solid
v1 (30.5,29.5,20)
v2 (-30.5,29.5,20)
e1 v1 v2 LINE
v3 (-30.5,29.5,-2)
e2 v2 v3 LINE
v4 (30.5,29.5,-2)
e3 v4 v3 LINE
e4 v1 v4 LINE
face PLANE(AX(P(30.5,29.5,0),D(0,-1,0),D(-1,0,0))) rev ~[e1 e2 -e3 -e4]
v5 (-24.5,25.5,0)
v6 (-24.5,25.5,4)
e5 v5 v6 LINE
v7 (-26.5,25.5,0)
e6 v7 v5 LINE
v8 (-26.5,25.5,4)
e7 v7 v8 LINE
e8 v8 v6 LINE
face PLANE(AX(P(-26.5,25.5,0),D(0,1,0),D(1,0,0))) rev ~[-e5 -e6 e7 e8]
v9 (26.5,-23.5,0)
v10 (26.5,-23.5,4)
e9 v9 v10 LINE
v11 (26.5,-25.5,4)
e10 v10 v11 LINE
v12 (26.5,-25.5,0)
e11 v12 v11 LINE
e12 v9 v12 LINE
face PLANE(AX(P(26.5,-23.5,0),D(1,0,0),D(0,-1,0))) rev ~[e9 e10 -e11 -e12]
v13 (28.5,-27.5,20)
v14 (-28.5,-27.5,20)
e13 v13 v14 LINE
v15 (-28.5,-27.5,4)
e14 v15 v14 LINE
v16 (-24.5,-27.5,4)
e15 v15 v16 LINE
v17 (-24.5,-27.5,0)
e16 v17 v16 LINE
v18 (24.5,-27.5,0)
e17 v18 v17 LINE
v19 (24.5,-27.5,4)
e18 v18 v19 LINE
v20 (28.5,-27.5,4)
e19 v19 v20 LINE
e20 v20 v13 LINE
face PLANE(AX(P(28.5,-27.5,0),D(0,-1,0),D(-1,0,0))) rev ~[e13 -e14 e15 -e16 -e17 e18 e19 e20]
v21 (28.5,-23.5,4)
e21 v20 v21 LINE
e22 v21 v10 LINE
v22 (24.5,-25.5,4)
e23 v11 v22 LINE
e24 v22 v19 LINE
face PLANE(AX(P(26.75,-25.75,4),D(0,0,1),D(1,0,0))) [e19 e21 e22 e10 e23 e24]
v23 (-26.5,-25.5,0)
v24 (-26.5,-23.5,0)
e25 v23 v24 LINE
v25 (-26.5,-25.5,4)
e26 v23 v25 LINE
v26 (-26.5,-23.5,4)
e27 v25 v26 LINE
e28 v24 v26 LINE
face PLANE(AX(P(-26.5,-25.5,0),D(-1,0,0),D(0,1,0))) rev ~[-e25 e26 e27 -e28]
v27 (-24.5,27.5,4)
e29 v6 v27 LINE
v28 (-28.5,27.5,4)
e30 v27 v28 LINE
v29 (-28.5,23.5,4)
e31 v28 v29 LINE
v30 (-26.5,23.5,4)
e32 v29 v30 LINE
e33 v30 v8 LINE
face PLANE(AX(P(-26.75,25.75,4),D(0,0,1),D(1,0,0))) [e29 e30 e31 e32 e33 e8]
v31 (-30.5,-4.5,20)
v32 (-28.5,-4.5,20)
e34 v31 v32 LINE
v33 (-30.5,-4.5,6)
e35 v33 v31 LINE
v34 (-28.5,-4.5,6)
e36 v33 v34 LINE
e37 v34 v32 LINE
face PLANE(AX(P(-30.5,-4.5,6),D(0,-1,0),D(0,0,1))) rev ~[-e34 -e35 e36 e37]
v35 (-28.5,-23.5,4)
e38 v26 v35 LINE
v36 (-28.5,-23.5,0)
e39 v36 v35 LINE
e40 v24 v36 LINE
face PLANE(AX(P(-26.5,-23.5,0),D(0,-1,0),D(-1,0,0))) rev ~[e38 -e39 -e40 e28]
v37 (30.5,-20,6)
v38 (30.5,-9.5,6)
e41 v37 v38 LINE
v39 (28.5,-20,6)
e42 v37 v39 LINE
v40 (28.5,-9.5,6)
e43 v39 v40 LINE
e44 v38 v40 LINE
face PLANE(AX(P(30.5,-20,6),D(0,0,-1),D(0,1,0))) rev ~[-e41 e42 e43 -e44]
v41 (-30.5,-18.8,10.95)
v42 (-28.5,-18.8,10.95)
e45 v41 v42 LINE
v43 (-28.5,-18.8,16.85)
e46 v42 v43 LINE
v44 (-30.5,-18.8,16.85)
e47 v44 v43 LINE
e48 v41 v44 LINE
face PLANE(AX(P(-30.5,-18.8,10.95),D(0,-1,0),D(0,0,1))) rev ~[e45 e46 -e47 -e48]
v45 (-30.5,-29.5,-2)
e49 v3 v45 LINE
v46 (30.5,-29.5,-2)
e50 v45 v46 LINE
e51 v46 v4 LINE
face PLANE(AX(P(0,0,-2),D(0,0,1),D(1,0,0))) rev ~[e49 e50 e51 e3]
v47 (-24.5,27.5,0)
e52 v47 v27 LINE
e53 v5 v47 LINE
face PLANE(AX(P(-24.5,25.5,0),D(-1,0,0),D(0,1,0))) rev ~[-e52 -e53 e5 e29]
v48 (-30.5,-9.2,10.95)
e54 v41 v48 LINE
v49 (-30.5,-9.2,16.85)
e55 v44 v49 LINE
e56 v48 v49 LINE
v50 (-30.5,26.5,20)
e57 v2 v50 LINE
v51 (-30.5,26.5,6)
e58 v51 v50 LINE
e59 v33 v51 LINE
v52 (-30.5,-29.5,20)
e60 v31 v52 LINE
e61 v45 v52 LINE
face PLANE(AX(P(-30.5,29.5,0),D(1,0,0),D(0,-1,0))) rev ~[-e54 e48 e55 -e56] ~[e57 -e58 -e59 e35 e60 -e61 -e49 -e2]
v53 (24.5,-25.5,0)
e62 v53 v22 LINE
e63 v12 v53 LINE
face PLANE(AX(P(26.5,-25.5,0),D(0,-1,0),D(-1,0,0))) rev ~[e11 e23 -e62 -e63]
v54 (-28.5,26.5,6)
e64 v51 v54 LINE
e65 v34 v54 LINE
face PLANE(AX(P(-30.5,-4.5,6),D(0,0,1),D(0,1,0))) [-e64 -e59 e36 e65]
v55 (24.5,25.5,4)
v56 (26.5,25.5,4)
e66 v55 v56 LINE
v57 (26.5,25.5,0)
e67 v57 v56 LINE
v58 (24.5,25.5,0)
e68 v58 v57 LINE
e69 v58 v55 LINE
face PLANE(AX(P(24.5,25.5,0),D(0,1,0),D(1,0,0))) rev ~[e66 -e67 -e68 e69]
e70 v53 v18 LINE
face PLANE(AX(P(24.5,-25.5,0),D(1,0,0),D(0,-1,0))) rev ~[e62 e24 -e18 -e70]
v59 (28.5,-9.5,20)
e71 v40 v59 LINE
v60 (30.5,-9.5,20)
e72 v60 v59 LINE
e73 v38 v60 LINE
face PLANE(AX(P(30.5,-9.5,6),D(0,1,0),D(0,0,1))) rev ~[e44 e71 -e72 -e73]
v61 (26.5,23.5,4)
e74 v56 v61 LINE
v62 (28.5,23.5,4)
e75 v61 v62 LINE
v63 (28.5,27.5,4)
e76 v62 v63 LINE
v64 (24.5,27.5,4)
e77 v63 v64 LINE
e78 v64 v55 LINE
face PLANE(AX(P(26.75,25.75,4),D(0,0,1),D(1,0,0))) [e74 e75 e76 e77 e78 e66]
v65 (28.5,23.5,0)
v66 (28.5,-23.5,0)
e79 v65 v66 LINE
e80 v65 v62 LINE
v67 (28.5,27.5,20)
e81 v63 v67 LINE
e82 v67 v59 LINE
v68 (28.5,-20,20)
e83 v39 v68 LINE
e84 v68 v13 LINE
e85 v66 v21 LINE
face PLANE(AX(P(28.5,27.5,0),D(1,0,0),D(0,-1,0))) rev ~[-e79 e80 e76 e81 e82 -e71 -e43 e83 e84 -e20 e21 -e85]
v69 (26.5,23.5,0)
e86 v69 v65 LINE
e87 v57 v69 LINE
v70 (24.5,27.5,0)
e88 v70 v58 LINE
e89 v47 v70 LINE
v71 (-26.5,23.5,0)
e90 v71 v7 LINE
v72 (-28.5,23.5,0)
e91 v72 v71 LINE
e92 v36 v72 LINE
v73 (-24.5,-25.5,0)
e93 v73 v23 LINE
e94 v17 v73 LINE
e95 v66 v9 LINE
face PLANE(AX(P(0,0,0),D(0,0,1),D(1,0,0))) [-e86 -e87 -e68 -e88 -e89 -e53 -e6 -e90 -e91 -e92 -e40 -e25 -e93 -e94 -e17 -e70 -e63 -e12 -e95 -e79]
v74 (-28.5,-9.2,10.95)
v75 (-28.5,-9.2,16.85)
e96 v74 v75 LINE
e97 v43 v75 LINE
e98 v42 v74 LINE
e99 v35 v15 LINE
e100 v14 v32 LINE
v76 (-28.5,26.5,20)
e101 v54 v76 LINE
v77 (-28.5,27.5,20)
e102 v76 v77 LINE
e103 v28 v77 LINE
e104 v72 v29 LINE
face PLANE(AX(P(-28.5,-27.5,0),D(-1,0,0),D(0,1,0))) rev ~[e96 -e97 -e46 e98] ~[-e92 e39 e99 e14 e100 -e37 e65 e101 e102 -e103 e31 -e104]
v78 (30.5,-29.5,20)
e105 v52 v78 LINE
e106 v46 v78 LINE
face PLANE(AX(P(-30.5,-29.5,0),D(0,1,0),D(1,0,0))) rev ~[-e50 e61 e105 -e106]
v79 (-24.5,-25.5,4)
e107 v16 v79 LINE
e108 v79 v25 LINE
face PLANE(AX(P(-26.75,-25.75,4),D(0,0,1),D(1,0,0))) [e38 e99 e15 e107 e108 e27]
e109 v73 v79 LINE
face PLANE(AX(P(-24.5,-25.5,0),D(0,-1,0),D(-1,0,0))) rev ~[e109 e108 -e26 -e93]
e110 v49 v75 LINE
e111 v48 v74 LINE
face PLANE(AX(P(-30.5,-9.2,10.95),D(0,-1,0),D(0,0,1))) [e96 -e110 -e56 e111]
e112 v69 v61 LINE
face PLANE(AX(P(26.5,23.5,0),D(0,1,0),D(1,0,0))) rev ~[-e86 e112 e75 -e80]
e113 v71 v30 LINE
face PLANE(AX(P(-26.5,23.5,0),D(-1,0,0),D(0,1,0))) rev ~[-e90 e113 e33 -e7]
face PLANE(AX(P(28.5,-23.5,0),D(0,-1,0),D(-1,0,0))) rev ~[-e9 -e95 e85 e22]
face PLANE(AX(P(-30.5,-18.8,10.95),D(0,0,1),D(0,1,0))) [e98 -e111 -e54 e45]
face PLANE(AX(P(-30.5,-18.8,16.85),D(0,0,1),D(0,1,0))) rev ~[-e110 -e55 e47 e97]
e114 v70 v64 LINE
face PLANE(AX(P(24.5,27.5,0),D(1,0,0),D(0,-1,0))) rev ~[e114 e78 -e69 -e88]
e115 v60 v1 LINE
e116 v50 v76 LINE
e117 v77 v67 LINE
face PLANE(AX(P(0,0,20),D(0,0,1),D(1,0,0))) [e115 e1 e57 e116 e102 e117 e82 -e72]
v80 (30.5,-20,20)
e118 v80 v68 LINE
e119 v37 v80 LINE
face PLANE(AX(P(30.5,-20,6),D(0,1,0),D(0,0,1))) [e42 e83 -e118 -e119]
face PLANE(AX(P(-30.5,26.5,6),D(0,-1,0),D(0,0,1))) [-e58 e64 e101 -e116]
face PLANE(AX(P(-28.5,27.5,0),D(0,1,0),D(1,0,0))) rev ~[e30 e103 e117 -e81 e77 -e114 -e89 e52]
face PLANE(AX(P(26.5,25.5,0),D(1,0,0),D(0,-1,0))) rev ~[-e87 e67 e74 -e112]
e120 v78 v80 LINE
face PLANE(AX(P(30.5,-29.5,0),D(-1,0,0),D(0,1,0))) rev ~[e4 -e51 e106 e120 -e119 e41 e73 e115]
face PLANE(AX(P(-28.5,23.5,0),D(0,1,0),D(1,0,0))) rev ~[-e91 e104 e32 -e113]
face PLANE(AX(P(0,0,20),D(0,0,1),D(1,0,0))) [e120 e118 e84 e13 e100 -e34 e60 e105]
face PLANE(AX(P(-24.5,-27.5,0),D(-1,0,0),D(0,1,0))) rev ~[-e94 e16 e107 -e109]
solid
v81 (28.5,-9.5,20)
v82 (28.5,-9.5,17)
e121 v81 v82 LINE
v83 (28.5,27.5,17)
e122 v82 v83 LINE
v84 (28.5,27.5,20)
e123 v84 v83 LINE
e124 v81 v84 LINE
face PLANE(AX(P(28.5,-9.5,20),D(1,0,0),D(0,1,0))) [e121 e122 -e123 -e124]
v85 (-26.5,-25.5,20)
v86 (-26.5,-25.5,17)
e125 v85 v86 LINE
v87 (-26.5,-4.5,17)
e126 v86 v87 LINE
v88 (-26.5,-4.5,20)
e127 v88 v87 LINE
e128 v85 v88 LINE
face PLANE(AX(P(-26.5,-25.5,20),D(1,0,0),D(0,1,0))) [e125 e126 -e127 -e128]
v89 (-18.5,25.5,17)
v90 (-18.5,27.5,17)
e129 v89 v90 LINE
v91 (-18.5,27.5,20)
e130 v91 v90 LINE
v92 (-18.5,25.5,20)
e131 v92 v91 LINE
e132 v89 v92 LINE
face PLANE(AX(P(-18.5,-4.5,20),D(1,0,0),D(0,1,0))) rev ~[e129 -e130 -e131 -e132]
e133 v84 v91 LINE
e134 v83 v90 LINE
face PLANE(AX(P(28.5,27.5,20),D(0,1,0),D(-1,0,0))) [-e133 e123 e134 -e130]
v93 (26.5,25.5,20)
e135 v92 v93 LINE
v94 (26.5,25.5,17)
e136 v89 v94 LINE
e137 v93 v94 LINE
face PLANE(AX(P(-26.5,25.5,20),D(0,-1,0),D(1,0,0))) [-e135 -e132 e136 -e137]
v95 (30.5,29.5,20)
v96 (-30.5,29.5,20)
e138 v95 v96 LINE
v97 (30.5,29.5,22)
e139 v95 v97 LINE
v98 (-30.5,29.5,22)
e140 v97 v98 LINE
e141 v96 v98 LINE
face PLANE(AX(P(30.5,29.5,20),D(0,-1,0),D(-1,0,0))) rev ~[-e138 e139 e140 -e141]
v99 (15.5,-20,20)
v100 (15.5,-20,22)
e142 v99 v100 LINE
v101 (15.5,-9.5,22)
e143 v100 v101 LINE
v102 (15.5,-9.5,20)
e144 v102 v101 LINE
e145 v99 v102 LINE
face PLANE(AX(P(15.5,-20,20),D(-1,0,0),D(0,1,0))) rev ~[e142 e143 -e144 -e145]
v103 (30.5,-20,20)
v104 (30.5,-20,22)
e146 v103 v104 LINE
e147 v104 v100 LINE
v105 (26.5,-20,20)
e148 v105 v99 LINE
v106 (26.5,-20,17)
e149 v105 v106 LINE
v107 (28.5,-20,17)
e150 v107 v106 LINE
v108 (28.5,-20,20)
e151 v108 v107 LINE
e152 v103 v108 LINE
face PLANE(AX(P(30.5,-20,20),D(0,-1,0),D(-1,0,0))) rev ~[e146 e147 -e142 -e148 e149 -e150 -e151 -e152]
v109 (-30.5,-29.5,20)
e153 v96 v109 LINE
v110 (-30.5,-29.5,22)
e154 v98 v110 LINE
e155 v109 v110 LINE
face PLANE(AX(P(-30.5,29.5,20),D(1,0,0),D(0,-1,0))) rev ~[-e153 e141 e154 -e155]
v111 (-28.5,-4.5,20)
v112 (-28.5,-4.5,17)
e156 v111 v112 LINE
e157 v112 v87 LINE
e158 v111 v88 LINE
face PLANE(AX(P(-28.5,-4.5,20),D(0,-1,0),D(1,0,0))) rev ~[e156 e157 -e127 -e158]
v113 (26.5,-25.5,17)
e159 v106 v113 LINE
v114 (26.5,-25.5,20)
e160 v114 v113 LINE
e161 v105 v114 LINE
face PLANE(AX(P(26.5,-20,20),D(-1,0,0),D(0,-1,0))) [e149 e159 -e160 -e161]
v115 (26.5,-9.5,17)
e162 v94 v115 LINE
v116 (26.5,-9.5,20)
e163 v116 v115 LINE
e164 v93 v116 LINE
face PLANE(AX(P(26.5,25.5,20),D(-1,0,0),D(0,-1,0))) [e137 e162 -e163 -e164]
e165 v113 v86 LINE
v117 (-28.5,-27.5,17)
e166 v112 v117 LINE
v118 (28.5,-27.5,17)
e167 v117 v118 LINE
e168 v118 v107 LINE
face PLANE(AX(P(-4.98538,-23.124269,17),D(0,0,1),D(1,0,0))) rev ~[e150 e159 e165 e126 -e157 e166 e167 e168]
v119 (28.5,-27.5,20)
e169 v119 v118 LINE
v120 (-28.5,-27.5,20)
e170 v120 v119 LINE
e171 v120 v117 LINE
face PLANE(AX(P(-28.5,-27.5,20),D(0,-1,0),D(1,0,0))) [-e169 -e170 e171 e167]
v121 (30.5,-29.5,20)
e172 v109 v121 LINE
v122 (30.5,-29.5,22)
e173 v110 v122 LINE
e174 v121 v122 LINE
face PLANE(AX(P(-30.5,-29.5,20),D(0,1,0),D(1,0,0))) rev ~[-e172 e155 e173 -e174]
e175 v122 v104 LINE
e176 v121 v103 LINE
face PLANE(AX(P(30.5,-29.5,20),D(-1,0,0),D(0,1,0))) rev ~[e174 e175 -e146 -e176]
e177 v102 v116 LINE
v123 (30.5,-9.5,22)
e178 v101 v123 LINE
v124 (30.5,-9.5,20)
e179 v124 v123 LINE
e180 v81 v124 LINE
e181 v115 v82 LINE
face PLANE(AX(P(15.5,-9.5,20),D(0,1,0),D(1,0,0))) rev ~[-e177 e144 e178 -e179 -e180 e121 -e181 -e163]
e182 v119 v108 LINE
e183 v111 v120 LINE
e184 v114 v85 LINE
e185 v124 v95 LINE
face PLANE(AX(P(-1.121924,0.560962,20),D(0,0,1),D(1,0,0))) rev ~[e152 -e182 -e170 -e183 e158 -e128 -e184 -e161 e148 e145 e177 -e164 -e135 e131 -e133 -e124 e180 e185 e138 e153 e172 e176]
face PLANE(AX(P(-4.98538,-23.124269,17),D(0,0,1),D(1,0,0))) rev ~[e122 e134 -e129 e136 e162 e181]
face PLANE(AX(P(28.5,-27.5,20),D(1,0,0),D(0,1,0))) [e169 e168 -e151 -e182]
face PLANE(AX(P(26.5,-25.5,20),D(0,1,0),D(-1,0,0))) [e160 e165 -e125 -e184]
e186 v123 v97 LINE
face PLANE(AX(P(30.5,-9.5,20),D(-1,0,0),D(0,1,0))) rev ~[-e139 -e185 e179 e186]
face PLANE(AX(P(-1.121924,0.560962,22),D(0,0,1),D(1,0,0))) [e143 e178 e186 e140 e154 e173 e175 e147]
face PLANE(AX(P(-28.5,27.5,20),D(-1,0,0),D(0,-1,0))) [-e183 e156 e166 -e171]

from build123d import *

# Parameters (mm, degrees)
F1_DEPTH  = 2
F2_DEPTH  = 20
F4_W      = 31
F4_H      = 14
F5_DEPTH  = 2
F7_W      = 10.5
F7_H      = 14
F8_DEPTH  = 2
F4_W_2    = 9.6
F4_H_2    = 5.9
F9_DEPTH  = 25
F11_W     = 8
F11_H     = 30
F12_DEPTH = 2
F13_DEPTH = 3
F14_DEPTH = 3
F15_DEPTH = 4


with BuildPart() as f1:
    # F0 (on Top) → F1 (new body)
    with BuildSketch(Plane.XY):
        Polygon((-30.5, 29.5), (-30.5, -4.5), (-30.5, -29.5), (30.5, -29.5), (30.5, 29.5), align=None)
        Polygon((28.5, -23.5), (28.5, -27.5), (24.5, -27.5), (-24.5, -27.5), (-28.5, -27.5), (-28.5, -23.5), (-28.5, -4.5), (-28.5, 23.5), (-28.5, 27.5), (-24.5, 27.5), (24.5, 27.5), (28.5, 27.5), (28.5, 23.5), align=None, mode=Mode.SUBTRACT)
        Polygon((24.5, -27.5), (28.5, -27.5), (28.5, -23.5), (26.5, -23.5), (26.5, -25.5), (24.5, -25.5), align=None)
        Polygon((-24.5, -27.5), (24.5, -27.5), (24.5, -25.5), (26.5, -25.5), (26.5, -23.5), (28.5, -23.5), (28.5, 23.5), (26.5, 23.5), (26.5, 25.5), (24.5, 25.5), (24.5, 27.5), (-24.5, 27.5), (-24.5, 25.5), (-26.5, 25.5), (-26.5, 23.5), (-28.5, 23.5), (-28.5, -4.5), (-28.5, -23.5), (-26.5, -23.5), (-26.5, -25.5), (-24.5, -25.5), align=None)
        Polygon((-28.5, -27.5), (-24.5, -27.5), (-24.5, -25.5), (-26.5, -25.5), (-26.5, -23.5), (-28.5, -23.5), align=None)
        Polygon((26.5, 23.5), (28.5, 23.5), (28.5, 27.5), (24.5, 27.5), (24.5, 25.5), (26.5, 25.5), align=None)
        Polygon((-24.5, 25.5), (-24.5, 27.5), (-28.5, 27.5), (-28.5, 23.5), (-26.5, 23.5), (-26.5, 25.5), align=None)
    extrude(amount=-F1_DEPTH)

    # F0 (on Top) → F2 (join)
    with BuildSketch(Plane.XY):
        Polygon((-30.5, 29.5), (-30.5, -4.5), (-30.5, -29.5), (30.5, -29.5), (30.5, 29.5), align=None)
        Polygon((28.5, -23.5), (28.5, -27.5), (24.5, -27.5), (-24.5, -27.5), (-28.5, -27.5), (-28.5, -23.5), (-28.5, -4.5), (-28.5, 23.5), (-28.5, 27.5), (-24.5, 27.5), (24.5, 27.5), (28.5, 27.5), (28.5, 23.5), align=None, mode=Mode.SUBTRACT)
    extrude(amount=F2_DEPTH)

    # F4 (on offset) → F5 (cut, through all)
    with BuildSketch(Plane.YZ.offset(-30.5)):
        with Locations((11, 13)):
            Rectangle(F4_W, F4_H)
    extrude(amount=F5_DEPTH, mode=Mode.SUBTRACT)

    # F7 (on offset) → F8 (cut, through all)
    with BuildSketch(Plane.YZ.offset(30.5)):
        with Locations((-14.75, 13)):
            Rectangle(F7_W, F7_H)
    extrude(amount=-F8_DEPTH, mode=Mode.SUBTRACT)

    # F4 (on offset) → F9 (cut)
    with BuildSketch(Plane.YZ.offset(-30.5)):
        with Locations((-14, 13.9)):
            Rectangle(F4_W_2, F4_H_2)
    extrude(amount=F9_DEPTH, mode=Mode.SUBTRACT)

    # F0 (on Top) → F15 (join)
    with BuildSketch(Plane.XY):
        Polygon((26.5, 23.5), (28.5, 23.5), (28.5, 27.5), (24.5, 27.5), (24.5, 25.5), (26.5, 25.5), align=None)
        Polygon((-24.5, 25.5), (-24.5, 27.5), (-28.5, 27.5), (-28.5, 23.5), (-26.5, 23.5), (-26.5, 25.5), align=None)
        Polygon((-28.5, -27.5), (-24.5, -27.5), (-24.5, -25.5), (-26.5, -25.5), (-26.5, -23.5), (-28.5, -23.5), align=None)
        Polygon((24.5, -27.5), (28.5, -27.5), (28.5, -23.5), (26.5, -23.5), (26.5, -25.5), (24.5, -25.5), align=None)
    extrude(amount=F15_DEPTH)


with BuildPart() as f12:
    # F11 (on offset) → F12 (new body)
    with BuildSketch(Plane.XY.offset(20)):
        Polygon((28.5, -20), (28.5, -27.5), (-28.5, -27.5), (-28.5, -4.5), (-28.5, 27.5), (-18.5, 27.5), (28.5, 27.5), (28.5, -9.5), (30.5, -9.5), (30.5, 29.5), (-30.5, 29.5), (-30.5, -29.5), (30.5, -29.5), (30.5, -20), align=None)
        Polygon((26.5, -25.5), (26.5, -20), (15.5, -20), (15.5, -9.5), (26.5, -9.5), (26.5, 25.5), (-18.5, 25.5), (-18.5, -4.5), (-26.5, -4.5), (-26.5, -25.5), align=None)
        Polygon((-28.5, -27.5), (28.5, -27.5), (28.5, -20), (26.5, -20), (26.5, -25.5), (-26.5, -25.5), (-26.5, -4.5), (-28.5, -4.5), align=None)
        with Locations((-22.5, 10.5)):
            Rectangle(F11_W, F11_H)
        Polygon((-28.5, 27.5), (-28.5, -4.5), (-26.5, -4.5), (-26.5, 25.5), (-18.5, 25.5), (-18.5, 27.5), align=None)
        Polygon((26.5, -9.5), (28.5, -9.5), (28.5, 27.5), (-18.5, 27.5), (-18.5, 25.5), (26.5, 25.5), align=None)
    extrude(amount=F12_DEPTH)

    # F11 (on offset) → F13 (join)
    with BuildSketch(Plane.XY.offset(20)):
        Polygon((-28.5, -27.5), (28.5, -27.5), (28.5, -20), (26.5, -20), (26.5, -25.5), (-26.5, -25.5), (-26.5, -4.5), (-28.5, -4.5), align=None)
        Polygon((-28.5, 27.5), (-28.5, -4.5), (-26.5, -4.5), (-26.5, 25.5), (-18.5, 25.5), (-18.5, 27.5), align=None)
        Polygon((26.5, -9.5), (28.5, -9.5), (28.5, 27.5), (-18.5, 27.5), (-18.5, 25.5), (26.5, 25.5), align=None)
    extrude(amount=-F13_DEPTH)

    # F11 (on offset) → F14 (cut)
    with BuildSketch(Plane.XY.offset(20)):
        with Locations((-22.5, 10.5)):
            Rectangle(F11_W, F11_H)
        Polygon((-28.5, 27.5), (-28.5, -4.5), (-26.5, -4.5), (-26.5, 25.5), (-18.5, 25.5), (-18.5, 27.5), align=None)
    extrude(amount=-F14_DEPTH, mode=Mode.SUBTRACT)


solid = Compound([f1.part, f12.part])
